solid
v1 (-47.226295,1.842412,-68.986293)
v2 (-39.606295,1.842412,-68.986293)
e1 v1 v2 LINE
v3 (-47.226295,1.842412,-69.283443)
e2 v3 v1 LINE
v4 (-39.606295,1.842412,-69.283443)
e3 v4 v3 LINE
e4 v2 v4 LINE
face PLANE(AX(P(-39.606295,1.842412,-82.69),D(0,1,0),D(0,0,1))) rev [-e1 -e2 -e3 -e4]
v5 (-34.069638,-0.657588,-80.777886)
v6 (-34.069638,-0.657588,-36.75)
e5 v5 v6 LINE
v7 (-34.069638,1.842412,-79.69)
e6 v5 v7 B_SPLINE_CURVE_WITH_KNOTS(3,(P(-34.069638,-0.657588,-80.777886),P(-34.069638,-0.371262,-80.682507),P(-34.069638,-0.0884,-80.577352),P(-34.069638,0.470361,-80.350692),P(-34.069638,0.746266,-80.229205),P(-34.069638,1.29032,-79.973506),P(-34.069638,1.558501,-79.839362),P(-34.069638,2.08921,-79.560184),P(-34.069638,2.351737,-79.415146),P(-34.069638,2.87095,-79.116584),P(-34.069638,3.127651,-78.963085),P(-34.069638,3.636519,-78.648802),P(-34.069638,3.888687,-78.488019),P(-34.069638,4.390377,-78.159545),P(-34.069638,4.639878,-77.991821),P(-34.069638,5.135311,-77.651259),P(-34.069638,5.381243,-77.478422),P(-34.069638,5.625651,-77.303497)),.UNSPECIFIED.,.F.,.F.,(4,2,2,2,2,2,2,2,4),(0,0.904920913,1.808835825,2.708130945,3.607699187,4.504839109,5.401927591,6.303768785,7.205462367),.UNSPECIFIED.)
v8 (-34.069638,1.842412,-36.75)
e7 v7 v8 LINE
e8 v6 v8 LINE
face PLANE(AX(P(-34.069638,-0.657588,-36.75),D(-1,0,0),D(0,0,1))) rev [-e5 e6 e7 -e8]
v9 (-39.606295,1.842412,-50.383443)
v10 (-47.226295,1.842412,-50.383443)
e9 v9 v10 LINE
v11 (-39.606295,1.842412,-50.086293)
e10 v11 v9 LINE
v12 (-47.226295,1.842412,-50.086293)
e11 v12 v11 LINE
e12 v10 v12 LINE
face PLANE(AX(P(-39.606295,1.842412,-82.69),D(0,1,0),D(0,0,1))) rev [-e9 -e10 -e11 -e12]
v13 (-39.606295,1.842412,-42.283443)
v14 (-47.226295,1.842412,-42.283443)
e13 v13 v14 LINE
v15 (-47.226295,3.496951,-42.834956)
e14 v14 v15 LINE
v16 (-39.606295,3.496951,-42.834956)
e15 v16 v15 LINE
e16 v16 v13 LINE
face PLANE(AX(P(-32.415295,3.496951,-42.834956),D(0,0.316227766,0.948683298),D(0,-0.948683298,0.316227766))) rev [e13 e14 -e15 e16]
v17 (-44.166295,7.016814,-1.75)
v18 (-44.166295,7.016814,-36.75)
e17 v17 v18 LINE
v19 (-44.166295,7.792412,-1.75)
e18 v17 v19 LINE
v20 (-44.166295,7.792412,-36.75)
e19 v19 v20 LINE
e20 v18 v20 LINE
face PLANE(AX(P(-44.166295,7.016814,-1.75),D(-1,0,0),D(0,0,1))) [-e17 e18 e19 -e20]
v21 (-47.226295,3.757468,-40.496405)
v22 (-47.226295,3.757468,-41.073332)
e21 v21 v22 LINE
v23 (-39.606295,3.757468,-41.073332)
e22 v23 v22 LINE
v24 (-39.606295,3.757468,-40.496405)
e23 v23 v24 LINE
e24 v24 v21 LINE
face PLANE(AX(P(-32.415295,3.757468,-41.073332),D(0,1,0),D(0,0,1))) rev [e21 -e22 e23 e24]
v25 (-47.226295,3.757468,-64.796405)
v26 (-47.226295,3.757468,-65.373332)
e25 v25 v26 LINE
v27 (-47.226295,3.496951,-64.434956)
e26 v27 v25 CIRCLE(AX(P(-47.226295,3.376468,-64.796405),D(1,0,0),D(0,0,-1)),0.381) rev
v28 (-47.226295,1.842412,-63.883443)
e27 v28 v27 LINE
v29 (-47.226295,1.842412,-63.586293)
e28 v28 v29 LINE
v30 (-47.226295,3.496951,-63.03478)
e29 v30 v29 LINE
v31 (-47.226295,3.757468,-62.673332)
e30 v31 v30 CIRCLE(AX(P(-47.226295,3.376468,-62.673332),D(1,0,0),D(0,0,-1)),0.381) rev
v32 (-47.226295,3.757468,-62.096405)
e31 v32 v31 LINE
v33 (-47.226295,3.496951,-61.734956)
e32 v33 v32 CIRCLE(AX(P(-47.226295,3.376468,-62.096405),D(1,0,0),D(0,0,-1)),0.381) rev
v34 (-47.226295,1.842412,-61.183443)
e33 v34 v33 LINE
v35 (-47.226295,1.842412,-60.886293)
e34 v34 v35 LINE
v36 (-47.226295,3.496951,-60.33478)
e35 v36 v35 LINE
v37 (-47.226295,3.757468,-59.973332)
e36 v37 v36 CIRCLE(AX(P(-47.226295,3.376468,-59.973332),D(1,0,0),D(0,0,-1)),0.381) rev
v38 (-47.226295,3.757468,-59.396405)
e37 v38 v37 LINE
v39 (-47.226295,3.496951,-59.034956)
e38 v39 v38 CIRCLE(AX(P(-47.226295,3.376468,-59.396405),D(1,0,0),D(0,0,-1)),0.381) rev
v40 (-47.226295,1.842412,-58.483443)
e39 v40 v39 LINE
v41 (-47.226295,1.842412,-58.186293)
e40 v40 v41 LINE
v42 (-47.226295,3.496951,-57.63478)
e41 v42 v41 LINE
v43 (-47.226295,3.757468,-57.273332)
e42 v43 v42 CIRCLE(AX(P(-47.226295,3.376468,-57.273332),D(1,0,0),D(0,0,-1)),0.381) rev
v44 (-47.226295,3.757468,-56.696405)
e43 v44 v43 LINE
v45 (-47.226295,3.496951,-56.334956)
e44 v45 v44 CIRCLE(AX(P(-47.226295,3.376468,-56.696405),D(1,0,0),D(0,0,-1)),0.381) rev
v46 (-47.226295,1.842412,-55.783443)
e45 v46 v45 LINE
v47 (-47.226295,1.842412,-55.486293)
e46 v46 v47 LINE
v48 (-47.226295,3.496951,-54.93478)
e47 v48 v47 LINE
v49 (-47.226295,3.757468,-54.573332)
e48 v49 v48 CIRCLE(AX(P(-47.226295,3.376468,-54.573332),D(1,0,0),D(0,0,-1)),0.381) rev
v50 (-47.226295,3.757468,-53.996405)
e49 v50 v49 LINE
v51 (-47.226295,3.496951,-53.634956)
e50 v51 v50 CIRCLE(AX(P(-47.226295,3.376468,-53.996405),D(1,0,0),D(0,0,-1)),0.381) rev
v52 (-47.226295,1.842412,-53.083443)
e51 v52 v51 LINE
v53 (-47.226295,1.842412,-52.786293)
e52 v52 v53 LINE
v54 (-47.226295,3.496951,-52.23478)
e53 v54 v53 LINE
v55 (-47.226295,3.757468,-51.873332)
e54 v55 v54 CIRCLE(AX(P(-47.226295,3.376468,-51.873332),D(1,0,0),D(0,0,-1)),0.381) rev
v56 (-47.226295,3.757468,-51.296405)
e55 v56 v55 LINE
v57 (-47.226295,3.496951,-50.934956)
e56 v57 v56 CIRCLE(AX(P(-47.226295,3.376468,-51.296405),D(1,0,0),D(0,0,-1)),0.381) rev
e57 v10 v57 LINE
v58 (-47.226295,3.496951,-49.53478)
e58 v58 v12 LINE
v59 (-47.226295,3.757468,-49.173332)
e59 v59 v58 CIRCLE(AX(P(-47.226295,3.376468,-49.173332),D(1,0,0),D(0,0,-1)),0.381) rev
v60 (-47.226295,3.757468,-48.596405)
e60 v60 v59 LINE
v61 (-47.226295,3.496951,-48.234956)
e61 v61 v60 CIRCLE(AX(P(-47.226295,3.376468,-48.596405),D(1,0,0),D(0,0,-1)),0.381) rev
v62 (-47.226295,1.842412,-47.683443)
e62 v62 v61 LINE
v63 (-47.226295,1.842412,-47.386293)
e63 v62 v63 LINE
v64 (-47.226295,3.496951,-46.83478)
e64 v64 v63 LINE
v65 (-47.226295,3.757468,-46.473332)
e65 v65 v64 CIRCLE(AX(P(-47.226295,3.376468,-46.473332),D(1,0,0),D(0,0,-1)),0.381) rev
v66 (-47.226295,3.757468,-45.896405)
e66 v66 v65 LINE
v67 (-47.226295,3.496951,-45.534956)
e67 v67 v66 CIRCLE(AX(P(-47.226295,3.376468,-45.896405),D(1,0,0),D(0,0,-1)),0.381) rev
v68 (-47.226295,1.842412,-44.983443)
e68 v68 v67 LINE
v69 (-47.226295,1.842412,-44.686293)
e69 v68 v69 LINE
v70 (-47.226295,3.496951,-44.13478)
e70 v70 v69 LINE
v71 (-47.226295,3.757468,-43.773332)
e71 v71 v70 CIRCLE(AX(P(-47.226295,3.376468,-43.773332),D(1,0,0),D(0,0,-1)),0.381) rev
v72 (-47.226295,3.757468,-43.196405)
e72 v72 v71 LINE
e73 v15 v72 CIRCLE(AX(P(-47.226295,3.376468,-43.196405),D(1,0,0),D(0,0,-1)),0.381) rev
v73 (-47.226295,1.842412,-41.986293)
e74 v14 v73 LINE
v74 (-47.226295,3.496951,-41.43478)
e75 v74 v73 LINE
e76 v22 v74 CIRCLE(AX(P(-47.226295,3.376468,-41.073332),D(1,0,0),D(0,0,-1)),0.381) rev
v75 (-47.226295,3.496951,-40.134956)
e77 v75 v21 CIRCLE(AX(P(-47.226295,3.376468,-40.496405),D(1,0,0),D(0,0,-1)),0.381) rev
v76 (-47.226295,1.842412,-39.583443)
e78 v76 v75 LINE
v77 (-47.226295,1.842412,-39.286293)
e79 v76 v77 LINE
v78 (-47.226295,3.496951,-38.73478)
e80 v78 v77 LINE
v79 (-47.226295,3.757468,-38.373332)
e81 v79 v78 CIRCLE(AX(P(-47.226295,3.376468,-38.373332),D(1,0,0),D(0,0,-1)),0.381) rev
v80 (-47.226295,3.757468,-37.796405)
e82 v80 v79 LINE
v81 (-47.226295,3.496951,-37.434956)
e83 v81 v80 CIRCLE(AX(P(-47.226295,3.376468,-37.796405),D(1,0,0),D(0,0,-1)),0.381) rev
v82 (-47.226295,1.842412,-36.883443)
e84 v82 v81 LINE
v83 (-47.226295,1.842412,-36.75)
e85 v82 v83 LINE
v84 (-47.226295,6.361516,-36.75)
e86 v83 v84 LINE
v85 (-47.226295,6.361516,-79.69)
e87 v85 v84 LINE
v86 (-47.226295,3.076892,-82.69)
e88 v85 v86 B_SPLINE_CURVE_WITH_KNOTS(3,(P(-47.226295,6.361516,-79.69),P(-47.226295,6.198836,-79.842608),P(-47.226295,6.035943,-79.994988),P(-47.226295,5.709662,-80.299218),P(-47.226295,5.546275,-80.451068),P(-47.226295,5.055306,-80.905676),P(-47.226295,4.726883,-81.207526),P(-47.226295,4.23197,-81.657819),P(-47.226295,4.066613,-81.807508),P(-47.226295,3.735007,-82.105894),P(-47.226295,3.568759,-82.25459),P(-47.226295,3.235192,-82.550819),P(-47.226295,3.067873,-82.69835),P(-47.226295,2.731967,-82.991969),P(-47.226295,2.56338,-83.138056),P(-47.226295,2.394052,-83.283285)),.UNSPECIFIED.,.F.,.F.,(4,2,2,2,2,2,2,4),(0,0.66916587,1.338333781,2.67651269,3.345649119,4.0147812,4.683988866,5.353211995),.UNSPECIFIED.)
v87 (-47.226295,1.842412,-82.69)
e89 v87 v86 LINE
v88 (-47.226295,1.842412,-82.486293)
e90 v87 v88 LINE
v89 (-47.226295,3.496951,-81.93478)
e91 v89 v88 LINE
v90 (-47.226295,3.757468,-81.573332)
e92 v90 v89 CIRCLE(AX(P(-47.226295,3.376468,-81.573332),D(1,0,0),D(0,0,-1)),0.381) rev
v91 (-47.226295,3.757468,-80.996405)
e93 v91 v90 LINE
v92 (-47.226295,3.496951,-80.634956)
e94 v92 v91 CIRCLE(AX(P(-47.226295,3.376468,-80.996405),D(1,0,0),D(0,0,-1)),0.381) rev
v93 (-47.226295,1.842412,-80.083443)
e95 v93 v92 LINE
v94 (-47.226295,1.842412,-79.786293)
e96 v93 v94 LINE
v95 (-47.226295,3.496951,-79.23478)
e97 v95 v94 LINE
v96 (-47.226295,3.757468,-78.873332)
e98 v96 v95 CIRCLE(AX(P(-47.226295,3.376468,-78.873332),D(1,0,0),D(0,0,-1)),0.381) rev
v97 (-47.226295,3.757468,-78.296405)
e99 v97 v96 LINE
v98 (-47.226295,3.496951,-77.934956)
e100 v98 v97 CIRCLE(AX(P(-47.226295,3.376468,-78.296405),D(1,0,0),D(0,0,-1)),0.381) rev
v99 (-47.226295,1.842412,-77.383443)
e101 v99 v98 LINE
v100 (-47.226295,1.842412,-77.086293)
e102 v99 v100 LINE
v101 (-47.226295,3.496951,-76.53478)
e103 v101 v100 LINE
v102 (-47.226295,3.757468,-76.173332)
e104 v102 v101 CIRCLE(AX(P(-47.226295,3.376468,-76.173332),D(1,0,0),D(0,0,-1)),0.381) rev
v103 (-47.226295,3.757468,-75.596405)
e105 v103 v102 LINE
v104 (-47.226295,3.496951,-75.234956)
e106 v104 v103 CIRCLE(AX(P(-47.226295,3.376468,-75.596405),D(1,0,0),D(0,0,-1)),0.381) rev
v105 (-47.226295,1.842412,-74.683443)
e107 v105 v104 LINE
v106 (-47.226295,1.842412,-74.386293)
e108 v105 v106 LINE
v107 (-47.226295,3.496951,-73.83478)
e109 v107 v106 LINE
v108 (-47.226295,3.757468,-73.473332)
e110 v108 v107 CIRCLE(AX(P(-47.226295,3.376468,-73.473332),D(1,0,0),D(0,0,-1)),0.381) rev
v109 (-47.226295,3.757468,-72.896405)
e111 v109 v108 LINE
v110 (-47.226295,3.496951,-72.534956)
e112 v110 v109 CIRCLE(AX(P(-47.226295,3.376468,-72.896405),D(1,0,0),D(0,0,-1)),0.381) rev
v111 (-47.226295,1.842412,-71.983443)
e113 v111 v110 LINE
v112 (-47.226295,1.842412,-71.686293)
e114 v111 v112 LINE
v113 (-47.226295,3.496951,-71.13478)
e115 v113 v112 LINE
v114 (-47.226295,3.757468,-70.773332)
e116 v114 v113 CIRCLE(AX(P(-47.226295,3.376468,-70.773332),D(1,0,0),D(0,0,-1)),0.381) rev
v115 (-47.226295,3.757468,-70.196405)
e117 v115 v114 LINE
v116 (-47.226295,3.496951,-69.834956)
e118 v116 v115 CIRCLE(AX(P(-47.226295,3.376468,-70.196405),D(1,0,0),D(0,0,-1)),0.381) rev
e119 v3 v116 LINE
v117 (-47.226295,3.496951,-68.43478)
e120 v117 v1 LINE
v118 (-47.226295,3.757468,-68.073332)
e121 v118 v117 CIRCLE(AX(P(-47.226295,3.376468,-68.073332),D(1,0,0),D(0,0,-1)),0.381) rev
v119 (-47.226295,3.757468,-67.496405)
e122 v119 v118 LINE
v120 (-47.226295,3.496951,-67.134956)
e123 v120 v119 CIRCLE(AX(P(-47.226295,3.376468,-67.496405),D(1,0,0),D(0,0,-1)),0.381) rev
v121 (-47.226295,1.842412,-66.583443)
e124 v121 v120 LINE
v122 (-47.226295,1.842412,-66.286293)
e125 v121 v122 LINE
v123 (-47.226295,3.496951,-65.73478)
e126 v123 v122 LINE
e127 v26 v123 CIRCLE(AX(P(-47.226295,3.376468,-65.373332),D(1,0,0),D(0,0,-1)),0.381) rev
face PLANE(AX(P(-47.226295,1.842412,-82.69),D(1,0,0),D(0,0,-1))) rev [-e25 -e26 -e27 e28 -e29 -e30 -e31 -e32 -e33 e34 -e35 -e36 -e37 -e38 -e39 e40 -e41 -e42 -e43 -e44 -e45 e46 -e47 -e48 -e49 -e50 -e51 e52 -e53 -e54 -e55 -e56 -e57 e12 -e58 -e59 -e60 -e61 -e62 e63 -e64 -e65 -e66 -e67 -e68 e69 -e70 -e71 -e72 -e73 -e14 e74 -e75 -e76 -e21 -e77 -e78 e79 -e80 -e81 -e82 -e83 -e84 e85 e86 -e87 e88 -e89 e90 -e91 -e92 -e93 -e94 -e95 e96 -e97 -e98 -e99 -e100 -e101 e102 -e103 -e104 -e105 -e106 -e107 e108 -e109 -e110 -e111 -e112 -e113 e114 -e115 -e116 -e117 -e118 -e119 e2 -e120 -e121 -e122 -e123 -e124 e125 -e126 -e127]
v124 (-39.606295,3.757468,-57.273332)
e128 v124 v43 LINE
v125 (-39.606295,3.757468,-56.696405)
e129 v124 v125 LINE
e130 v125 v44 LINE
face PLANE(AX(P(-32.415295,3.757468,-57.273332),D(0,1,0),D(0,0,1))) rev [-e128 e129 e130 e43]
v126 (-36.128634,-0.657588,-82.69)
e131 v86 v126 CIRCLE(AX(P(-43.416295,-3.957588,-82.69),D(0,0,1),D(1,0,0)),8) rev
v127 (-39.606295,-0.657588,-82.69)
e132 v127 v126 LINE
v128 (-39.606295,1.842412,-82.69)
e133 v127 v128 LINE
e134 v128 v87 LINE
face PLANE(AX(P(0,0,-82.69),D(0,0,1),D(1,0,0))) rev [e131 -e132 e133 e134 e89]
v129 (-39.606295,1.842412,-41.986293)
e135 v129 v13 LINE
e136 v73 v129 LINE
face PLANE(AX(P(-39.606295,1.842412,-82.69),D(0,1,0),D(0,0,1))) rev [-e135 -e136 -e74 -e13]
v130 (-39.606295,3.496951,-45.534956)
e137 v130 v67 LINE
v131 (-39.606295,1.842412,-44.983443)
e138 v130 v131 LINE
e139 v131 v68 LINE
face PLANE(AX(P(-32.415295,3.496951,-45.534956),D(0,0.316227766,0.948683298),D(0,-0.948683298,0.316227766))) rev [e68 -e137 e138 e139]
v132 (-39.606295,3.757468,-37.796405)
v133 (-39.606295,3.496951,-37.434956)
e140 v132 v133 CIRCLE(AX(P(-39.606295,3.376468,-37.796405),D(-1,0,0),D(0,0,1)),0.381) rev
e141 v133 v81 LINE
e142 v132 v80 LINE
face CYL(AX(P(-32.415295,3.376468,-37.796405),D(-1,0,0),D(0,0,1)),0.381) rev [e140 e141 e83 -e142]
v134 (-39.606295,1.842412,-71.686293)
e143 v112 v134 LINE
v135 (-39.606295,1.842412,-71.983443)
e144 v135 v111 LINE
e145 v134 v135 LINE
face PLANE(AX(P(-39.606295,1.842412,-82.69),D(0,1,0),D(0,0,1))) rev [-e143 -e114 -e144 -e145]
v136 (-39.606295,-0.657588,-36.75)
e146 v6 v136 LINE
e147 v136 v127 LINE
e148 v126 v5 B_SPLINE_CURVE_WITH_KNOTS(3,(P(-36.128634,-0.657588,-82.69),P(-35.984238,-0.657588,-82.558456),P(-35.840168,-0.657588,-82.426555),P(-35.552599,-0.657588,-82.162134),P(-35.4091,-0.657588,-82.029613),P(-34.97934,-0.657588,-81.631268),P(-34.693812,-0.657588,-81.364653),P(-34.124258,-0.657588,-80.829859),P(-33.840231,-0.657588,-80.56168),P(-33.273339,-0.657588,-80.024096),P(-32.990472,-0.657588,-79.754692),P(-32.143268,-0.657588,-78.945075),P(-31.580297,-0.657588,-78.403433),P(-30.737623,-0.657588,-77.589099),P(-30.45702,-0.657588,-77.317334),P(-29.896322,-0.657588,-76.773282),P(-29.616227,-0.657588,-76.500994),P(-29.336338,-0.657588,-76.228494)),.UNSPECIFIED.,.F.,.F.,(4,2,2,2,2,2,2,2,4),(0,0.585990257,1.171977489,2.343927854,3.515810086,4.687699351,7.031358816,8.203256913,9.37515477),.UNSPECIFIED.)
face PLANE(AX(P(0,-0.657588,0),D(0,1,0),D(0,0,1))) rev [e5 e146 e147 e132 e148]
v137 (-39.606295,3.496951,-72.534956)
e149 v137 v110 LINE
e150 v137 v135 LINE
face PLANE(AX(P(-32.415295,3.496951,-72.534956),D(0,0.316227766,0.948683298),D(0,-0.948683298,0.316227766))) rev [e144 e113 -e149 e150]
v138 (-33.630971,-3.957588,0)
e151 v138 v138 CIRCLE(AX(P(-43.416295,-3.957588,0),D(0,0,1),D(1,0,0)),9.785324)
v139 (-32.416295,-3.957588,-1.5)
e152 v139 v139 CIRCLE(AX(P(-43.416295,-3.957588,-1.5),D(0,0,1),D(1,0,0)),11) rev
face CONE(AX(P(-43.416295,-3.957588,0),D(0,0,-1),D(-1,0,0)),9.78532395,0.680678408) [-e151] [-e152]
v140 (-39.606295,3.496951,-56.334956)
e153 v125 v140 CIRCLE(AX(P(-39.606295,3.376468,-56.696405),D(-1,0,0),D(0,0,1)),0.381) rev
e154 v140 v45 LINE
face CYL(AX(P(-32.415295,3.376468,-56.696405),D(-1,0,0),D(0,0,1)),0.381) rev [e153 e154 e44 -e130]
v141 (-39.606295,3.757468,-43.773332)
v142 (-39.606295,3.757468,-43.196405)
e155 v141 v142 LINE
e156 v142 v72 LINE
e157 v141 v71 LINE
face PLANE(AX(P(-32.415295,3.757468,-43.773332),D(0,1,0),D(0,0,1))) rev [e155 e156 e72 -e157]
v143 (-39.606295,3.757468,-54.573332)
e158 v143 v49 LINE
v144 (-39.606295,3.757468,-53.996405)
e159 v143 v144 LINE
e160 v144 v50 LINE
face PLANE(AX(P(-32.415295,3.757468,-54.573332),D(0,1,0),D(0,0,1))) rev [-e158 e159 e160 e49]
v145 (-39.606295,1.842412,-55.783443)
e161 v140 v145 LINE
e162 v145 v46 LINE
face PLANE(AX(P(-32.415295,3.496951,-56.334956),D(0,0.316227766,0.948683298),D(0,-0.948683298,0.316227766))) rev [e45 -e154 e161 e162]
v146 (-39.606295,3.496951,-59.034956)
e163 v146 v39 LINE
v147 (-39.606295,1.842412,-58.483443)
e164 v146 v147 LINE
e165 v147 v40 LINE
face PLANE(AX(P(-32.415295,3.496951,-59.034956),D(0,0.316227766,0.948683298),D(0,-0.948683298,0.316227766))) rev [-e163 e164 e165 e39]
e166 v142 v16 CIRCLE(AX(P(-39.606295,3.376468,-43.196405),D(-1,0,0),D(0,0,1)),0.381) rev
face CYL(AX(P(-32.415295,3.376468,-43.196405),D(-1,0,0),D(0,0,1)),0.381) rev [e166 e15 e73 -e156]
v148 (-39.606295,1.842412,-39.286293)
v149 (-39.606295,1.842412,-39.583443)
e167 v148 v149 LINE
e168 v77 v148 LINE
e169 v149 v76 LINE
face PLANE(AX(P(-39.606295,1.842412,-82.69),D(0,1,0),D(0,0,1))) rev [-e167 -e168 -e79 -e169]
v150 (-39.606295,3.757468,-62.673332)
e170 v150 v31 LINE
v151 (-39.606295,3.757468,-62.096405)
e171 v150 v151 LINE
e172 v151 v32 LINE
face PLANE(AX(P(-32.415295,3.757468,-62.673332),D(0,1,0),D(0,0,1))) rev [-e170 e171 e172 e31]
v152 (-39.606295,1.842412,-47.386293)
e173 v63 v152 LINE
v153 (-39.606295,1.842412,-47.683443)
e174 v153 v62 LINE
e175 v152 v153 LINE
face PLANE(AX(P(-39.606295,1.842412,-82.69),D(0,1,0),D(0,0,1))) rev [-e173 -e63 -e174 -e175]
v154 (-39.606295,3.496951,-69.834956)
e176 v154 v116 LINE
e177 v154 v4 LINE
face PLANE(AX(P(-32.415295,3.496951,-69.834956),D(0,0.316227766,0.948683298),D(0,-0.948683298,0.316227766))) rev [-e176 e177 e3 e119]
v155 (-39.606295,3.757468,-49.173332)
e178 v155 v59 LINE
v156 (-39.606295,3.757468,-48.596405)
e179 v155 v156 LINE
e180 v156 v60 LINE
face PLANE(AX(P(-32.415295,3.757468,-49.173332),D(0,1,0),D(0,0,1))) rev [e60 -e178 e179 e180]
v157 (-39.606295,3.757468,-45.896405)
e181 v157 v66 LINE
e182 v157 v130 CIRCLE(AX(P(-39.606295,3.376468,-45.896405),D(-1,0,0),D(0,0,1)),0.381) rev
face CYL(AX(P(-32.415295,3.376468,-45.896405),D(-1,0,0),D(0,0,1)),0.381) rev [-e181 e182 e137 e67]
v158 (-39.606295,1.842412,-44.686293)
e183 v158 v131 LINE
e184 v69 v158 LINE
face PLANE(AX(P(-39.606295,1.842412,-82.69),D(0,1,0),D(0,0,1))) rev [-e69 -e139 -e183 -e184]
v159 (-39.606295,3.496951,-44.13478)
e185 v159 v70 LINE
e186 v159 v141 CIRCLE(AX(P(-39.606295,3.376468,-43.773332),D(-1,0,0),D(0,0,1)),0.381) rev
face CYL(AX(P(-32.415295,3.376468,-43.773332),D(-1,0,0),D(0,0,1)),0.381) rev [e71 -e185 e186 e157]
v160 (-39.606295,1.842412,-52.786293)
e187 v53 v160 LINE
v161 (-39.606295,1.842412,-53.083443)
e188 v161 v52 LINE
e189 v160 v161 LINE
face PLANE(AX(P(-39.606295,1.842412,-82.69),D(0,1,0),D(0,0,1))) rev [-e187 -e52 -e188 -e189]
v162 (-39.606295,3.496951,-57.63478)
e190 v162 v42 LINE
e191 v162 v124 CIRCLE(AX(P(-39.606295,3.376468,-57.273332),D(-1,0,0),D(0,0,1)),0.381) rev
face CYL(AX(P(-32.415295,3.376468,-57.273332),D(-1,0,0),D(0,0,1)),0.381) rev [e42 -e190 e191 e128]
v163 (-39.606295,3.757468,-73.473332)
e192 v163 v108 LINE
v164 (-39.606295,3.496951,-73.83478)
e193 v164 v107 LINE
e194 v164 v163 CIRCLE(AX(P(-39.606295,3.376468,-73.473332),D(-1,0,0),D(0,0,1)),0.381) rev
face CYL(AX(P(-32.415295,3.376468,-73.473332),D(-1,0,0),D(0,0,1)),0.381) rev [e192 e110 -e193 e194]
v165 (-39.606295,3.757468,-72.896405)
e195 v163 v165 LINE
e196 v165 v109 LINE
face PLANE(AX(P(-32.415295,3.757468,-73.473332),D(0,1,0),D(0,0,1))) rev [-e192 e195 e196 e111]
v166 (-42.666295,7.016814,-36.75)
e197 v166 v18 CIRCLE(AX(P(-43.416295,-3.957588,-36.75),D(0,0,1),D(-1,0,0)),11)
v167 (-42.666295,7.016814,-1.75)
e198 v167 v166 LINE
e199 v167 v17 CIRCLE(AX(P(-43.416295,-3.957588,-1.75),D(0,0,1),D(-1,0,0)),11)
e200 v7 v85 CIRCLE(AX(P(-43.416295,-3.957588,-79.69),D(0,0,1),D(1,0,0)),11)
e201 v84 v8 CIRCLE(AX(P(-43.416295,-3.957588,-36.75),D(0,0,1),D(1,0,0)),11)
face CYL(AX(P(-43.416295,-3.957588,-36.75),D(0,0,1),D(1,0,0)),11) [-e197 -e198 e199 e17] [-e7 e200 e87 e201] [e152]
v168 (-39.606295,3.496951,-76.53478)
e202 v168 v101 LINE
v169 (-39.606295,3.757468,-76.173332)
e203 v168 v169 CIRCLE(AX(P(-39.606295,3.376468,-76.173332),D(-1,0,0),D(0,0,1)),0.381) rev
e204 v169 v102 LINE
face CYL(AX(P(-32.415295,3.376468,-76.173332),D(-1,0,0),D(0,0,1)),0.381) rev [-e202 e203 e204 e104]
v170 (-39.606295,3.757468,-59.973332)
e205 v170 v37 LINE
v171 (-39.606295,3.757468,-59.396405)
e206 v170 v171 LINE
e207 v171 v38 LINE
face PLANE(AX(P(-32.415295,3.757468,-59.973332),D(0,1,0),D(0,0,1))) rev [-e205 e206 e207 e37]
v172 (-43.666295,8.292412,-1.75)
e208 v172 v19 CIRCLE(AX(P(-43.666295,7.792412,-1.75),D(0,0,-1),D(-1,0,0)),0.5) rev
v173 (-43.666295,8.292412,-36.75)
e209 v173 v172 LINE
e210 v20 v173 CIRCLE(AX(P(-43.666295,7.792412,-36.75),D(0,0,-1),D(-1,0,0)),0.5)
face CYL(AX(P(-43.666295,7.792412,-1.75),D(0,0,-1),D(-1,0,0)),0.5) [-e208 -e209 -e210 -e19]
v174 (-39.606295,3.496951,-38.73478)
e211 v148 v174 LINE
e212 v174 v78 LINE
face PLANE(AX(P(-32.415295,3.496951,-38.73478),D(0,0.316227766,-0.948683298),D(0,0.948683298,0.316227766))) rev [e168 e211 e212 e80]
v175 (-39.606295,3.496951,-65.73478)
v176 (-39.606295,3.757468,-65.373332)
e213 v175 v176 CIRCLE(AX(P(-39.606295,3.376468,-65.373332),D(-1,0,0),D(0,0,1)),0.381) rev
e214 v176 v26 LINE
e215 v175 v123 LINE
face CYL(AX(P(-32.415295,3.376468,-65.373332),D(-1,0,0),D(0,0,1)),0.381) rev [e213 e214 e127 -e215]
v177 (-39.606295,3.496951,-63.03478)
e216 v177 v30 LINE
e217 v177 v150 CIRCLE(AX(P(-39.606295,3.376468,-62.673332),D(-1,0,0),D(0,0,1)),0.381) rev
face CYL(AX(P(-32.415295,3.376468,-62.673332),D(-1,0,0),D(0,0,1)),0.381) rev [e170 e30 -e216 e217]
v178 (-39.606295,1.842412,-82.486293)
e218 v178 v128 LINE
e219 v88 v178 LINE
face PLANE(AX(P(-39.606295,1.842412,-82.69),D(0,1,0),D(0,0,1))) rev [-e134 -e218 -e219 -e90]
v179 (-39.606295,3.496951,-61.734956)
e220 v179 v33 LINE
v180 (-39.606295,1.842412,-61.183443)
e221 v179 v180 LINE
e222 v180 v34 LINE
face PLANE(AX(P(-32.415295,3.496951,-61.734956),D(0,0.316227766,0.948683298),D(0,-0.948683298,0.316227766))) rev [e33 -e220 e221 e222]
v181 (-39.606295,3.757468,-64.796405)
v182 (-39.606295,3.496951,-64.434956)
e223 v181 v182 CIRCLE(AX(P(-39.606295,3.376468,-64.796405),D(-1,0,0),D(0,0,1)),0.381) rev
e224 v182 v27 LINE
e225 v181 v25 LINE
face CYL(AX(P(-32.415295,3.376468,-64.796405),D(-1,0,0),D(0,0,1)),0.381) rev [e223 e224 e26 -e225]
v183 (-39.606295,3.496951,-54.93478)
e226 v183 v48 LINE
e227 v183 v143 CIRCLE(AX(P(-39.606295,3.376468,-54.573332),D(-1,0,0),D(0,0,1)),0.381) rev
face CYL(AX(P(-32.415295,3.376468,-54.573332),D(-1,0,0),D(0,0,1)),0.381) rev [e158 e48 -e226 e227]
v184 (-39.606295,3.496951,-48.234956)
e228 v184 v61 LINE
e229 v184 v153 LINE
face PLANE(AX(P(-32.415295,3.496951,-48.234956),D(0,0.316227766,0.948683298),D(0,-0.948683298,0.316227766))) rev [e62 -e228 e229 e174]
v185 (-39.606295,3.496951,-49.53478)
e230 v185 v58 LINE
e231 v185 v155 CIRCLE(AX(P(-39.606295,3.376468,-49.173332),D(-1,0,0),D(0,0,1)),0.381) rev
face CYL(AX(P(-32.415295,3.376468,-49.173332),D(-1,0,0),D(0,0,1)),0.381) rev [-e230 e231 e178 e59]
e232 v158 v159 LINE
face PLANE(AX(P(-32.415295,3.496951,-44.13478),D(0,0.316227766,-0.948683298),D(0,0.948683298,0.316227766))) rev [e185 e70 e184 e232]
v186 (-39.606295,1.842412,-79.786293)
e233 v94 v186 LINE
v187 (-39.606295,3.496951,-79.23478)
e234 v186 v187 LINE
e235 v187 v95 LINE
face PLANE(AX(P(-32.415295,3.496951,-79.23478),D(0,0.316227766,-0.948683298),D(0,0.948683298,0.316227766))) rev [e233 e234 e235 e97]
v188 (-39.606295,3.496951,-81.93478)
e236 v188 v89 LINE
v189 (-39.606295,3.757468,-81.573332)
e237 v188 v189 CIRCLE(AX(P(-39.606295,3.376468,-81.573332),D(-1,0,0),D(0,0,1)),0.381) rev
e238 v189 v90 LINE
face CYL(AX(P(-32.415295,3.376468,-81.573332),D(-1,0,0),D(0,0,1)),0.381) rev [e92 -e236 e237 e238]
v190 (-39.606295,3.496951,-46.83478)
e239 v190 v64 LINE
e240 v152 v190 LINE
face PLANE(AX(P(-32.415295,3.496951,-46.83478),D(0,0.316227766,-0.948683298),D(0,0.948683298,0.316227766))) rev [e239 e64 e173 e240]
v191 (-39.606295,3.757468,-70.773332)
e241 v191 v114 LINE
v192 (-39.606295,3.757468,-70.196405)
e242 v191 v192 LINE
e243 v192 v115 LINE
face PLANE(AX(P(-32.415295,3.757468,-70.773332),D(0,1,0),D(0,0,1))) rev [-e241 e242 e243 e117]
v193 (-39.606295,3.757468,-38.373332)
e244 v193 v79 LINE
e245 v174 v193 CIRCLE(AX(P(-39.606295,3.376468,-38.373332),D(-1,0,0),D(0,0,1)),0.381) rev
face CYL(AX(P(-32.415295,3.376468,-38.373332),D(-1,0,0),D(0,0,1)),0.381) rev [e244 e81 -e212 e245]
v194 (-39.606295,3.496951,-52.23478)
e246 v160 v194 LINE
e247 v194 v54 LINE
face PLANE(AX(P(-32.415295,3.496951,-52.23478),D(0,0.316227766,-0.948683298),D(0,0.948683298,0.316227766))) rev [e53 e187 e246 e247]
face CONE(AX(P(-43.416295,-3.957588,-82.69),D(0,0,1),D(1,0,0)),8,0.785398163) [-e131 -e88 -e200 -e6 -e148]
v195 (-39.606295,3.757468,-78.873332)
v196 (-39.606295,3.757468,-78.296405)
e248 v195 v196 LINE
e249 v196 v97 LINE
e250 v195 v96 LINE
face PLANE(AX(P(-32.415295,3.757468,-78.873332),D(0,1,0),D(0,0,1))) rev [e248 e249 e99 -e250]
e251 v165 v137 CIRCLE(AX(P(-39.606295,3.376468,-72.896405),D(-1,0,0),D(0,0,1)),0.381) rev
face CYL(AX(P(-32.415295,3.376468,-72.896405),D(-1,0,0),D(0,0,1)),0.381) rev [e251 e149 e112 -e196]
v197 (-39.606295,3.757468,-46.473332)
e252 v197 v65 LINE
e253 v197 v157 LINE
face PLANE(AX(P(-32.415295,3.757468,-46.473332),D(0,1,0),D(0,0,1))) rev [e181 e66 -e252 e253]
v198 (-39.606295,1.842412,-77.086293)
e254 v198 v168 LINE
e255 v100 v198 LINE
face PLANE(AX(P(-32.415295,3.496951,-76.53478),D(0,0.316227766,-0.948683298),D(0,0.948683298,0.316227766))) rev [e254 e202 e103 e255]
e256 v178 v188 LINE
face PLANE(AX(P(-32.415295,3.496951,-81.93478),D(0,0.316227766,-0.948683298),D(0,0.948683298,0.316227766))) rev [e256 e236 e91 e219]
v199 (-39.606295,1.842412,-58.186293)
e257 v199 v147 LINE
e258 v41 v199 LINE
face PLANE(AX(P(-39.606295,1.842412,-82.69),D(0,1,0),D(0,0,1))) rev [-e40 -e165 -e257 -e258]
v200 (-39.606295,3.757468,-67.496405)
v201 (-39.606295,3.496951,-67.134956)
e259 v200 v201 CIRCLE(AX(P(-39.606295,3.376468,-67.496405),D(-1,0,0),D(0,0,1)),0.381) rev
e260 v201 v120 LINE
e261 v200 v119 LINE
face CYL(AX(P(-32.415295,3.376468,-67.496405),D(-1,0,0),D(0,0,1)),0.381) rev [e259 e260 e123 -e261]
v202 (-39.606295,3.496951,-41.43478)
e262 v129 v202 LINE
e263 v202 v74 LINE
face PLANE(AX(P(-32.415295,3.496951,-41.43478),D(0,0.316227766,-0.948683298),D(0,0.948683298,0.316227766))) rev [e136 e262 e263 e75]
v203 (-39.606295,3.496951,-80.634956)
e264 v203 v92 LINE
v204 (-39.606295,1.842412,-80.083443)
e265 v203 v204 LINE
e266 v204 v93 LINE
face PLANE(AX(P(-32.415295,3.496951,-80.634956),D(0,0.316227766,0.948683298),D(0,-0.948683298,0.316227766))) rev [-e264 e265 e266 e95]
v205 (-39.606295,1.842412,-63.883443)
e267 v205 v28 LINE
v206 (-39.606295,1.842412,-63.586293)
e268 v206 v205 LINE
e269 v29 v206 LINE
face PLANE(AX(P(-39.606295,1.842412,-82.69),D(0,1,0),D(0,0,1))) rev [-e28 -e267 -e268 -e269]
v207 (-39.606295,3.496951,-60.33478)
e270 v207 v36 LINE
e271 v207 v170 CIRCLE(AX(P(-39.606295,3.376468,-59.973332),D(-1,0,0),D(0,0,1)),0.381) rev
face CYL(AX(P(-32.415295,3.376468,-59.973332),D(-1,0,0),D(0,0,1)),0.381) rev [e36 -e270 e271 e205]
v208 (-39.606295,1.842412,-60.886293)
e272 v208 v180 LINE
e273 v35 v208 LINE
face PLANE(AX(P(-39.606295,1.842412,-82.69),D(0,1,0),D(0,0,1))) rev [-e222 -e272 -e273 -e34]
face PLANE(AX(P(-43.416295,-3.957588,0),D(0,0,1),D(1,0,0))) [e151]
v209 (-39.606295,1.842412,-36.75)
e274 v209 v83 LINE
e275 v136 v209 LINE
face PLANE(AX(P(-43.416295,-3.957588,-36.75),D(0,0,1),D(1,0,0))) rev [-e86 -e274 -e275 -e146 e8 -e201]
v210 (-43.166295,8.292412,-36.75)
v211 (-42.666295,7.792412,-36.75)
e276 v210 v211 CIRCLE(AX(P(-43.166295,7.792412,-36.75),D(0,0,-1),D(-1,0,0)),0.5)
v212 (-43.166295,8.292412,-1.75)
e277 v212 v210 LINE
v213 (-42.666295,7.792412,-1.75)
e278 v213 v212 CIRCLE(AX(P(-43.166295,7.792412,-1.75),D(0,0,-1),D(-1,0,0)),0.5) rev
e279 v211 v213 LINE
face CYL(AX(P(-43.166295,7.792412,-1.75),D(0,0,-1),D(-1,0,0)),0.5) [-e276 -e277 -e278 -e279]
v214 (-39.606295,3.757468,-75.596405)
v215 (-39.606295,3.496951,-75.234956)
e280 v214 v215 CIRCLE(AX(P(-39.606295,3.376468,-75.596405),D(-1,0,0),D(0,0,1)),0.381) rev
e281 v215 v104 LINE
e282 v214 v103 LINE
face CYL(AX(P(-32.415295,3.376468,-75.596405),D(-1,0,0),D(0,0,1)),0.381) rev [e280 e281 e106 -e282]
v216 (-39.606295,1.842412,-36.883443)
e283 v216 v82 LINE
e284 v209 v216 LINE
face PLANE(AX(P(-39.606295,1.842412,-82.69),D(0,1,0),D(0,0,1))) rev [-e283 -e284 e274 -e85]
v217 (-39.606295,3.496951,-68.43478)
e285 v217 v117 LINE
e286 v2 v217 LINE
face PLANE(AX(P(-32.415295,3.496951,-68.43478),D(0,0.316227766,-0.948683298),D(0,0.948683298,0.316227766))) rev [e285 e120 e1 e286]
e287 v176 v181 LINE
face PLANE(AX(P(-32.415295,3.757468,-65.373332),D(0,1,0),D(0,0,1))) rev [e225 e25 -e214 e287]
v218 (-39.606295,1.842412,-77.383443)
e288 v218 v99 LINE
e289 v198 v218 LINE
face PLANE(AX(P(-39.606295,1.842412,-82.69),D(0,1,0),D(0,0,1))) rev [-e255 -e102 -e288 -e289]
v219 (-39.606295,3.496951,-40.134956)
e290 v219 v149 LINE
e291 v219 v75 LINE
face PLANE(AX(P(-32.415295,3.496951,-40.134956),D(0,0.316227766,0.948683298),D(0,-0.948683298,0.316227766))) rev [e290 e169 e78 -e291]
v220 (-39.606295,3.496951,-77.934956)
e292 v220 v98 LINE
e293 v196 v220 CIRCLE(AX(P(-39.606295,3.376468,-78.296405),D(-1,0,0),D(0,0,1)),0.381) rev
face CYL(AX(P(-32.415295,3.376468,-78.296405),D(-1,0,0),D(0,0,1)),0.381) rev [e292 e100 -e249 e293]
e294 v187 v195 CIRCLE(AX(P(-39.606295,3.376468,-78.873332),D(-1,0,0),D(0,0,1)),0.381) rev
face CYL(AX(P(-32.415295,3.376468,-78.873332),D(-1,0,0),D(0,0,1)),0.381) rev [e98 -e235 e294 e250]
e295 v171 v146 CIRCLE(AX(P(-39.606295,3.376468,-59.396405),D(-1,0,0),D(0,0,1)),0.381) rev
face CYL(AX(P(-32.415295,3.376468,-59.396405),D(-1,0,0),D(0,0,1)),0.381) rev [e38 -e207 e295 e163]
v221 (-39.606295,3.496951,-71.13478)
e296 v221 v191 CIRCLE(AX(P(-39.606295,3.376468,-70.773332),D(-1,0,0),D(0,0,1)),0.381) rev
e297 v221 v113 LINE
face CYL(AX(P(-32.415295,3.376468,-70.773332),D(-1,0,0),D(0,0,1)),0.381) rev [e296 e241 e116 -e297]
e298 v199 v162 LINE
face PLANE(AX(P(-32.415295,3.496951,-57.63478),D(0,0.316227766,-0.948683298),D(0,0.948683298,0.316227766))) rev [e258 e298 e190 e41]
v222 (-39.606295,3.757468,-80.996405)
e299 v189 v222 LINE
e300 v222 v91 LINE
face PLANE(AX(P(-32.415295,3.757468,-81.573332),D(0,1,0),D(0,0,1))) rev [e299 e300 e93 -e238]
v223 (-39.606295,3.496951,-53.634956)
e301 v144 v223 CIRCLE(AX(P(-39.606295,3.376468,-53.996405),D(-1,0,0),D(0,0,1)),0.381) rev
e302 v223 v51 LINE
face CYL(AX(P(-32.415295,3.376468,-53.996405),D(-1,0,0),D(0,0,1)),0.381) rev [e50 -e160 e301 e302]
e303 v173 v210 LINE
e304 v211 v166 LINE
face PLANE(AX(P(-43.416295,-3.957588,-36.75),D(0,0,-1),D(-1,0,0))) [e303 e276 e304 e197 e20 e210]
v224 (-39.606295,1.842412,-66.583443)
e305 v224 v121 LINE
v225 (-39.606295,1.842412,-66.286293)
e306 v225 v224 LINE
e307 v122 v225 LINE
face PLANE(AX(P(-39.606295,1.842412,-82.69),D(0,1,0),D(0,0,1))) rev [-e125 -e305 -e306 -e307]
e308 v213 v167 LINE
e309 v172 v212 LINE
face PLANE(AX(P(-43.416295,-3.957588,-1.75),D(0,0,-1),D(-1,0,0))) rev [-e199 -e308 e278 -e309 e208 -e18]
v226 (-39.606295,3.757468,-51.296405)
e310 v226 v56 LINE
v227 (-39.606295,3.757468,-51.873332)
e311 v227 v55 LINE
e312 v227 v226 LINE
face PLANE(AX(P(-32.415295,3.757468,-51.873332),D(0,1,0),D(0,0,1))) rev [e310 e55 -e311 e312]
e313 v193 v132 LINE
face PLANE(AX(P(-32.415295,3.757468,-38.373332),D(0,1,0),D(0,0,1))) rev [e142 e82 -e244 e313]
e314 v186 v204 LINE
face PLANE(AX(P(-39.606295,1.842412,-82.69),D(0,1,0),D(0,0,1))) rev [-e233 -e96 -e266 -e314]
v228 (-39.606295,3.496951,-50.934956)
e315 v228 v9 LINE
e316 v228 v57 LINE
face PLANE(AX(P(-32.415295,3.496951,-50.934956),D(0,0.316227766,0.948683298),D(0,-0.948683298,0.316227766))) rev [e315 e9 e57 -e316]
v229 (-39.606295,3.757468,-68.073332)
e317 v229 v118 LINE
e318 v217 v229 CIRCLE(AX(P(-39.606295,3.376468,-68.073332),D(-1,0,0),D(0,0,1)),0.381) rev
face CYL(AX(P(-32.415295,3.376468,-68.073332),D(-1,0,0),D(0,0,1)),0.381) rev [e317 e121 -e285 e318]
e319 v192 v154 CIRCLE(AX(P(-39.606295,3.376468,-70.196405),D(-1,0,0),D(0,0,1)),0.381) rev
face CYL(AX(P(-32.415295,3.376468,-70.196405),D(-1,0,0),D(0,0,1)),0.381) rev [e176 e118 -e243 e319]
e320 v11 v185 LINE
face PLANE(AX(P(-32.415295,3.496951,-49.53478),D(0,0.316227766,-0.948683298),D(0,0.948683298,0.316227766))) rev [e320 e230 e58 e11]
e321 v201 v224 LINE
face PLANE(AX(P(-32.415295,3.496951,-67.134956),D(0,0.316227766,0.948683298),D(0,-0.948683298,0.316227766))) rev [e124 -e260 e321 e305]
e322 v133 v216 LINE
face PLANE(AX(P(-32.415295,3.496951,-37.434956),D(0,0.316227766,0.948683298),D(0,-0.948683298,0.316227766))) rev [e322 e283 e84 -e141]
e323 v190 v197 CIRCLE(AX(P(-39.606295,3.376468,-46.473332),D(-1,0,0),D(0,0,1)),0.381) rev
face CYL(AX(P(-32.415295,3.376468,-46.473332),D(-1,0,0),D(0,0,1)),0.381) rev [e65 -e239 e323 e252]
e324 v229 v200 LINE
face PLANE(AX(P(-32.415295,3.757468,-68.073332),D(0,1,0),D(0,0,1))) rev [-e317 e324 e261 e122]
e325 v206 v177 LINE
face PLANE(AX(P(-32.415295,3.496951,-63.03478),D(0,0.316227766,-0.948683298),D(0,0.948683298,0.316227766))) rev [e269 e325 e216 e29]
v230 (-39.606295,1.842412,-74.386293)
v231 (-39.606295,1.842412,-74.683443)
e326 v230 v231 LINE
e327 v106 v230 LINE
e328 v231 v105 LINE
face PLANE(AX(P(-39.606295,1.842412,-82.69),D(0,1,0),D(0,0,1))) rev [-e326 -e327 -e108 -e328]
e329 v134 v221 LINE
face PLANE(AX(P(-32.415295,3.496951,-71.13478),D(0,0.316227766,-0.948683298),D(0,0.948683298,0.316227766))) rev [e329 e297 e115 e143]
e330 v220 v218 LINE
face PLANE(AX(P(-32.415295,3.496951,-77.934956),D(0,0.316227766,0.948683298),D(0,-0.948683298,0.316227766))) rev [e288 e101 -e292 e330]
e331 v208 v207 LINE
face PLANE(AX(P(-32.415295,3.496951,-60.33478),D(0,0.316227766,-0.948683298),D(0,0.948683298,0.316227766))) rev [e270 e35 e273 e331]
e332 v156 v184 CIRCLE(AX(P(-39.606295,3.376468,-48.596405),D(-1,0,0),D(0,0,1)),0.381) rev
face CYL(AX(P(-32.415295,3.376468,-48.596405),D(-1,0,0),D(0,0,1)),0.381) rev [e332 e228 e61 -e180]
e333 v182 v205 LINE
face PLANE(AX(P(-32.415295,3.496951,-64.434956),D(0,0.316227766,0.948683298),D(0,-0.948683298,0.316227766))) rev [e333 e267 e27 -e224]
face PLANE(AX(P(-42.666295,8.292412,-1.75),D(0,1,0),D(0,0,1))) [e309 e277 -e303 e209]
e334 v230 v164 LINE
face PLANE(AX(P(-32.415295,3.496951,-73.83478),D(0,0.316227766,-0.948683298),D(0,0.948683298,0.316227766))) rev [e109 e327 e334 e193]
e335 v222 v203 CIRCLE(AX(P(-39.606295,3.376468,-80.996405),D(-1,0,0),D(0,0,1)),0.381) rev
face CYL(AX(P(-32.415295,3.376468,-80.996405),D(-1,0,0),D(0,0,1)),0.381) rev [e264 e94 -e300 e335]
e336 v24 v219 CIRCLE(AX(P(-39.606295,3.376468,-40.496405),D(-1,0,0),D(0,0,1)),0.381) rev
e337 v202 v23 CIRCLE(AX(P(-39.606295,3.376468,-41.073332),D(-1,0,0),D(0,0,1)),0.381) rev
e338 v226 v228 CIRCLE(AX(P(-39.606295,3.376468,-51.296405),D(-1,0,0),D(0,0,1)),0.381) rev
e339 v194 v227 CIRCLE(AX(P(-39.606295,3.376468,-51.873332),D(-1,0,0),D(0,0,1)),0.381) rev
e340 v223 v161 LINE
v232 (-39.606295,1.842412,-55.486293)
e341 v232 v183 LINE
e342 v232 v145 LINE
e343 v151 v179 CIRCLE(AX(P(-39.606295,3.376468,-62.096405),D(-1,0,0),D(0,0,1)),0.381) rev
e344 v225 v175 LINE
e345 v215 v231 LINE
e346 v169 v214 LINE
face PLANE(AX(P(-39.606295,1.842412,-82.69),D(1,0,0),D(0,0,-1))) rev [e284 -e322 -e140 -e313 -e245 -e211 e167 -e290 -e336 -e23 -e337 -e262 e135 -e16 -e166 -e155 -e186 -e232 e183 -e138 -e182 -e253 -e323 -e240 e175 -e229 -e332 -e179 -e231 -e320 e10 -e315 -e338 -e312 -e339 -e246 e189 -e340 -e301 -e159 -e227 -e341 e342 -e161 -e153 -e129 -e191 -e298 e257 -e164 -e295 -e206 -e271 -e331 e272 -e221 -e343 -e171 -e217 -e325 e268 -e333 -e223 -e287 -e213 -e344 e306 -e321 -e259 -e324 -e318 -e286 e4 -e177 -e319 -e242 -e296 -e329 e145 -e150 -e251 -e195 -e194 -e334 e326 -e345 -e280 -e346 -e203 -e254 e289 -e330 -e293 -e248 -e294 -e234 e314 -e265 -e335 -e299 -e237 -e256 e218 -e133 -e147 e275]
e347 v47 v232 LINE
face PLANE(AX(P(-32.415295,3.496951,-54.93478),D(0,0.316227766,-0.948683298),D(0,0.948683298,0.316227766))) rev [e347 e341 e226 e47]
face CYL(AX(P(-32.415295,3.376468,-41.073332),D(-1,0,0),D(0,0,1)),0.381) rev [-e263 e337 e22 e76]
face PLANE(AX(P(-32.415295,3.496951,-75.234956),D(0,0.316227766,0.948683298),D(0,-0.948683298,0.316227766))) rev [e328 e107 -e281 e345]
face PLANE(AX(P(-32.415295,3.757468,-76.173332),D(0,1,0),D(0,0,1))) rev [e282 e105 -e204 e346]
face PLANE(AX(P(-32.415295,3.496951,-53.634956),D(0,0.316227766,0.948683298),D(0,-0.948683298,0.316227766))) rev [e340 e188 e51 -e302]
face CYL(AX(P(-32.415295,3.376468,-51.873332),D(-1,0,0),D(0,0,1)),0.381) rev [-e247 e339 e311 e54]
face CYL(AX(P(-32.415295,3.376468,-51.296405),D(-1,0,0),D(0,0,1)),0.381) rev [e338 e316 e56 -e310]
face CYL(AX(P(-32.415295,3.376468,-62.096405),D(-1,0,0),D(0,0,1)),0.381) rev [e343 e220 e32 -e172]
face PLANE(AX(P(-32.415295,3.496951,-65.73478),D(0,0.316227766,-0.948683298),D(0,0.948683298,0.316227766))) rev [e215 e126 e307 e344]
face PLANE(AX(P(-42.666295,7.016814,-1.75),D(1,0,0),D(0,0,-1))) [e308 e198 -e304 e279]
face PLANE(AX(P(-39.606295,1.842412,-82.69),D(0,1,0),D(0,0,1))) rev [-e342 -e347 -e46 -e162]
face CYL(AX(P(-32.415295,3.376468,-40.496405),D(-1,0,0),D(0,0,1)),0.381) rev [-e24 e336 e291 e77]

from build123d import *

# Parameters (mm, degrees)
SKETCH14_R           = 11
BOSS_EXTRUDE7_DEPTH  = 36.75
SKETCH18_W           = 7.62
SKETCH18_H           = 4.5
BOSS_EXTRUDE9_DEPTH  = 45.94
CUT_EXTRUDE16_REACH  = 87.359
LPATTERN1_COUNT      = 17
LPATTERN1_PITCH      = 2.7
BOSS_EXTRUDE10_DEPTH = 45.94
CHAMFER2_SIZE        = 1.5
CHAMFER2_SIZE2       = 1.21467605
BOSS_EXTRUDE11_DEPTH = 45.94
BOSS_EXTRUDE12_DEPTH = 2.5
BOSS_EXTRUDE14_START = -35
BOSS_EXTRUDE14_DEPTH = 35
FILLET2_R            = 0.5


with BuildPart() as part:
    # Sketch14 → Boss-Extrude7 (new body)
    with BuildSketch(Plane.XY):
        with Locations((-43.416294802, -3.957587863)):
            Circle(SKETCH14_R)
    extrude(amount=-BOSS_EXTRUDE7_DEPTH)

    # Sketch18 → Boss-Extrude9 (add)
    with BuildSketch(Plane(origin=(0, 0, -36.75), x_dir=(-1, 0, 0), z_dir=(0, 0, -1))):
        with Locations((43.416294802, 4.092412137)):
            Rectangle(SKETCH18_W, SKETCH18_H)
    extrude(amount=BOSS_EXTRUDE9_DEPTH)

    # Sketch19 → Cut-Extrude16 (cut, up to next)
    with BuildSketch(Plane.ZY.offset(47.409754566), mode=Mode.PRIVATE) as cut_extrude16_sk1:
        with BuildLine():
            Line((-81.573331938, 3.757468407), (-80.99640478, 3.757468407))
            ThreePointArc((-80.99640478, 3.757468407), (-80.773630162, 3.685551679), (-80.634956444, 3.496951186))
            Line((-80.634956444, 3.496951186), (-80.052462184, 1.749468407))
            Line((-80.052462184, 1.749468407), (-82.517274534, 1.749468407))
            Line((-82.517274534, 1.749468407), (-81.934780275, 3.496951186))
            ThreePointArc((-81.934780275, 3.496951186), (-81.796106557, 3.685551679), (-81.573331938, 3.757468407))
        make_face()
    cut_extrude16_tool1 = extrude(cut_extrude16_sk1.sketch, amount=-CUT_EXTRUDE16_REACH, mode=Mode.PRIVATE) & part.part
    cut_extrude16 = cut_extrude16_tool1.solids().sort_by_distance((-47.409755, 2.620329, -81.284868))[0]
    add(cut_extrude16, mode=Mode.SUBTRACT)

    # LPattern1: Cut-Extrude16 ×17
    with Locations(*[(0, 0, i * LPATTERN1_PITCH) for i in range(1, LPATTERN1_COUNT)]):
        add(cut_extrude16, mode=Mode.SUBTRACT)

    # Sketch20 → Boss-Extrude10 (add)
    with BuildSketch(Plane(origin=(0, 0, -36.75), x_dir=(-1, 0, 0), z_dir=(0, 0, -1))):
        with BuildLine():
            Line((39.606294802, 6.342412137), (47.226294802, 6.342412137))
            Line((47.226294802, 6.342412137), (47.226294802, 6.36151578))
            ThreePointArc((47.226294802, 6.36151578), (43.416294802, 7.042412137), (39.606294802, 6.36151578))
            Line((39.606294802, 6.36151578), (39.606294802, 6.342412137))
        make_face()
    extrude(amount=BOSS_EXTRUDE10_DEPTH)

    # Chamfer1: read off the stored shape, not the designer's step
    # Chamfer1 outline → Chamfer1 (revolve, cut)
    with BuildSketch(Plane(origin=(-43.416294802, -3.957587863, 0), x_dir=(1, 0, 0), z_dir=(0, -1, 0))):
        Polygon((11.000000059, -82.589999941), (10.9, -82.69), (11.000000059, -82.69), align=None)
    revolve(axis=Axis((-43.416294802, -3.957587863, 0), (0, 0, 1)), mode=Mode.SUBTRACT)

    # Chamfer2
    chamfer2_edges = [part.edges().sort_by_distance(p)[0] for p in [
        (-54.416294802, -3.957587863, 0),
    ]]
    chamfer2_side = [part.faces().sort_by_distance(p)[0] for p in [
        (-54.416294802, -3.957587863, -18.375),
    ]]
    chamfer(chamfer2_edges, length=CHAMFER2_SIZE, length2=CHAMFER2_SIZE2, reference=chamfer2_side[0])

    # Sketch21 → Boss-Extrude11 (add)
    with BuildSketch(Plane(origin=(0, 0, -36.75), x_dir=(-1, 0, 0), z_dir=(0, 0, -1))):
        with BuildLine():
            Line((39.606294802, 1.842412137), (39.606294802, 6.36151578))
            ThreePointArc((39.606294802, 6.36151578), (36.46072284, 4.564150146), (34.069637646, 1.842412137))
            Line((34.069637646, 1.842412137), (39.606294802, 1.842412137))
        make_face()
    extrude(amount=BOSS_EXTRUDE11_DEPTH)

    # Sketch23 → Boss-Extrude12 (add)
    with BuildSketch(Plane.XZ.offset(-1.842412137)):
        Polygon((-39.606294802, -36.883443427), (-39.606294802, -36.75), (-34.069637646, -36.75), (-34.069637646, -82.69), (-39.606294802, -82.69), (-39.606294802, -82.486293291), align=None)
    extrude(amount=BOSS_EXTRUDE12_DEPTH)

    # Chamfer4: read off the stored shape, not the designer's step
    # Chamfer4 outline → Chamfer4 (revolve, cut)
    with BuildSketch(Plane(origin=(-43.416294802, -3.957587863, 0), x_dir=(1, 0, 0), z_dir=(0, -1, 0))):
        Polygon((7.999999773, -82.690000227), (11.000000044, -82.69000017), (11.000000035, -79.69), align=None)
    revolve(axis=Axis((-43.416294802, -3.957587863, 0), (0, 0, 1)), mode=Mode.SUBTRACT)

    # Sketch24 → Boss-Extrude14 (add)
    with BuildSketch(Plane(origin=(0, 0, -36.75), x_dir=(-1, 0, 0), z_dir=(0, 0, -1)).offset(BOSS_EXTRUDE14_START)):
        with BuildLine():
            Line((42.666294802, 7.016814171), (42.666294802, 8.292412137))
            Line((42.666294802, 8.292412137), (44.166294802, 8.292412137))
            Line((44.166294802, 8.292412137), (44.166294802, 7.016814171))
            ThreePointArc((44.166294802, 7.016814171), (43.416294802, 7.042412137), (42.666294802, 7.016814171))
        make_face()
    extrude(amount=BOSS_EXTRUDE14_DEPTH)

    # Fillet2
    fillet2_edges = [part.edges().sort_by_distance(p)[0] for p in [
        (-42.666294802, 8.292412137, -19.25),
        (-44.166294802, 8.292412137, -19.25),
    ]]
    fillet(fillet2_edges, radius=FILLET2_R)


solid = part.part
